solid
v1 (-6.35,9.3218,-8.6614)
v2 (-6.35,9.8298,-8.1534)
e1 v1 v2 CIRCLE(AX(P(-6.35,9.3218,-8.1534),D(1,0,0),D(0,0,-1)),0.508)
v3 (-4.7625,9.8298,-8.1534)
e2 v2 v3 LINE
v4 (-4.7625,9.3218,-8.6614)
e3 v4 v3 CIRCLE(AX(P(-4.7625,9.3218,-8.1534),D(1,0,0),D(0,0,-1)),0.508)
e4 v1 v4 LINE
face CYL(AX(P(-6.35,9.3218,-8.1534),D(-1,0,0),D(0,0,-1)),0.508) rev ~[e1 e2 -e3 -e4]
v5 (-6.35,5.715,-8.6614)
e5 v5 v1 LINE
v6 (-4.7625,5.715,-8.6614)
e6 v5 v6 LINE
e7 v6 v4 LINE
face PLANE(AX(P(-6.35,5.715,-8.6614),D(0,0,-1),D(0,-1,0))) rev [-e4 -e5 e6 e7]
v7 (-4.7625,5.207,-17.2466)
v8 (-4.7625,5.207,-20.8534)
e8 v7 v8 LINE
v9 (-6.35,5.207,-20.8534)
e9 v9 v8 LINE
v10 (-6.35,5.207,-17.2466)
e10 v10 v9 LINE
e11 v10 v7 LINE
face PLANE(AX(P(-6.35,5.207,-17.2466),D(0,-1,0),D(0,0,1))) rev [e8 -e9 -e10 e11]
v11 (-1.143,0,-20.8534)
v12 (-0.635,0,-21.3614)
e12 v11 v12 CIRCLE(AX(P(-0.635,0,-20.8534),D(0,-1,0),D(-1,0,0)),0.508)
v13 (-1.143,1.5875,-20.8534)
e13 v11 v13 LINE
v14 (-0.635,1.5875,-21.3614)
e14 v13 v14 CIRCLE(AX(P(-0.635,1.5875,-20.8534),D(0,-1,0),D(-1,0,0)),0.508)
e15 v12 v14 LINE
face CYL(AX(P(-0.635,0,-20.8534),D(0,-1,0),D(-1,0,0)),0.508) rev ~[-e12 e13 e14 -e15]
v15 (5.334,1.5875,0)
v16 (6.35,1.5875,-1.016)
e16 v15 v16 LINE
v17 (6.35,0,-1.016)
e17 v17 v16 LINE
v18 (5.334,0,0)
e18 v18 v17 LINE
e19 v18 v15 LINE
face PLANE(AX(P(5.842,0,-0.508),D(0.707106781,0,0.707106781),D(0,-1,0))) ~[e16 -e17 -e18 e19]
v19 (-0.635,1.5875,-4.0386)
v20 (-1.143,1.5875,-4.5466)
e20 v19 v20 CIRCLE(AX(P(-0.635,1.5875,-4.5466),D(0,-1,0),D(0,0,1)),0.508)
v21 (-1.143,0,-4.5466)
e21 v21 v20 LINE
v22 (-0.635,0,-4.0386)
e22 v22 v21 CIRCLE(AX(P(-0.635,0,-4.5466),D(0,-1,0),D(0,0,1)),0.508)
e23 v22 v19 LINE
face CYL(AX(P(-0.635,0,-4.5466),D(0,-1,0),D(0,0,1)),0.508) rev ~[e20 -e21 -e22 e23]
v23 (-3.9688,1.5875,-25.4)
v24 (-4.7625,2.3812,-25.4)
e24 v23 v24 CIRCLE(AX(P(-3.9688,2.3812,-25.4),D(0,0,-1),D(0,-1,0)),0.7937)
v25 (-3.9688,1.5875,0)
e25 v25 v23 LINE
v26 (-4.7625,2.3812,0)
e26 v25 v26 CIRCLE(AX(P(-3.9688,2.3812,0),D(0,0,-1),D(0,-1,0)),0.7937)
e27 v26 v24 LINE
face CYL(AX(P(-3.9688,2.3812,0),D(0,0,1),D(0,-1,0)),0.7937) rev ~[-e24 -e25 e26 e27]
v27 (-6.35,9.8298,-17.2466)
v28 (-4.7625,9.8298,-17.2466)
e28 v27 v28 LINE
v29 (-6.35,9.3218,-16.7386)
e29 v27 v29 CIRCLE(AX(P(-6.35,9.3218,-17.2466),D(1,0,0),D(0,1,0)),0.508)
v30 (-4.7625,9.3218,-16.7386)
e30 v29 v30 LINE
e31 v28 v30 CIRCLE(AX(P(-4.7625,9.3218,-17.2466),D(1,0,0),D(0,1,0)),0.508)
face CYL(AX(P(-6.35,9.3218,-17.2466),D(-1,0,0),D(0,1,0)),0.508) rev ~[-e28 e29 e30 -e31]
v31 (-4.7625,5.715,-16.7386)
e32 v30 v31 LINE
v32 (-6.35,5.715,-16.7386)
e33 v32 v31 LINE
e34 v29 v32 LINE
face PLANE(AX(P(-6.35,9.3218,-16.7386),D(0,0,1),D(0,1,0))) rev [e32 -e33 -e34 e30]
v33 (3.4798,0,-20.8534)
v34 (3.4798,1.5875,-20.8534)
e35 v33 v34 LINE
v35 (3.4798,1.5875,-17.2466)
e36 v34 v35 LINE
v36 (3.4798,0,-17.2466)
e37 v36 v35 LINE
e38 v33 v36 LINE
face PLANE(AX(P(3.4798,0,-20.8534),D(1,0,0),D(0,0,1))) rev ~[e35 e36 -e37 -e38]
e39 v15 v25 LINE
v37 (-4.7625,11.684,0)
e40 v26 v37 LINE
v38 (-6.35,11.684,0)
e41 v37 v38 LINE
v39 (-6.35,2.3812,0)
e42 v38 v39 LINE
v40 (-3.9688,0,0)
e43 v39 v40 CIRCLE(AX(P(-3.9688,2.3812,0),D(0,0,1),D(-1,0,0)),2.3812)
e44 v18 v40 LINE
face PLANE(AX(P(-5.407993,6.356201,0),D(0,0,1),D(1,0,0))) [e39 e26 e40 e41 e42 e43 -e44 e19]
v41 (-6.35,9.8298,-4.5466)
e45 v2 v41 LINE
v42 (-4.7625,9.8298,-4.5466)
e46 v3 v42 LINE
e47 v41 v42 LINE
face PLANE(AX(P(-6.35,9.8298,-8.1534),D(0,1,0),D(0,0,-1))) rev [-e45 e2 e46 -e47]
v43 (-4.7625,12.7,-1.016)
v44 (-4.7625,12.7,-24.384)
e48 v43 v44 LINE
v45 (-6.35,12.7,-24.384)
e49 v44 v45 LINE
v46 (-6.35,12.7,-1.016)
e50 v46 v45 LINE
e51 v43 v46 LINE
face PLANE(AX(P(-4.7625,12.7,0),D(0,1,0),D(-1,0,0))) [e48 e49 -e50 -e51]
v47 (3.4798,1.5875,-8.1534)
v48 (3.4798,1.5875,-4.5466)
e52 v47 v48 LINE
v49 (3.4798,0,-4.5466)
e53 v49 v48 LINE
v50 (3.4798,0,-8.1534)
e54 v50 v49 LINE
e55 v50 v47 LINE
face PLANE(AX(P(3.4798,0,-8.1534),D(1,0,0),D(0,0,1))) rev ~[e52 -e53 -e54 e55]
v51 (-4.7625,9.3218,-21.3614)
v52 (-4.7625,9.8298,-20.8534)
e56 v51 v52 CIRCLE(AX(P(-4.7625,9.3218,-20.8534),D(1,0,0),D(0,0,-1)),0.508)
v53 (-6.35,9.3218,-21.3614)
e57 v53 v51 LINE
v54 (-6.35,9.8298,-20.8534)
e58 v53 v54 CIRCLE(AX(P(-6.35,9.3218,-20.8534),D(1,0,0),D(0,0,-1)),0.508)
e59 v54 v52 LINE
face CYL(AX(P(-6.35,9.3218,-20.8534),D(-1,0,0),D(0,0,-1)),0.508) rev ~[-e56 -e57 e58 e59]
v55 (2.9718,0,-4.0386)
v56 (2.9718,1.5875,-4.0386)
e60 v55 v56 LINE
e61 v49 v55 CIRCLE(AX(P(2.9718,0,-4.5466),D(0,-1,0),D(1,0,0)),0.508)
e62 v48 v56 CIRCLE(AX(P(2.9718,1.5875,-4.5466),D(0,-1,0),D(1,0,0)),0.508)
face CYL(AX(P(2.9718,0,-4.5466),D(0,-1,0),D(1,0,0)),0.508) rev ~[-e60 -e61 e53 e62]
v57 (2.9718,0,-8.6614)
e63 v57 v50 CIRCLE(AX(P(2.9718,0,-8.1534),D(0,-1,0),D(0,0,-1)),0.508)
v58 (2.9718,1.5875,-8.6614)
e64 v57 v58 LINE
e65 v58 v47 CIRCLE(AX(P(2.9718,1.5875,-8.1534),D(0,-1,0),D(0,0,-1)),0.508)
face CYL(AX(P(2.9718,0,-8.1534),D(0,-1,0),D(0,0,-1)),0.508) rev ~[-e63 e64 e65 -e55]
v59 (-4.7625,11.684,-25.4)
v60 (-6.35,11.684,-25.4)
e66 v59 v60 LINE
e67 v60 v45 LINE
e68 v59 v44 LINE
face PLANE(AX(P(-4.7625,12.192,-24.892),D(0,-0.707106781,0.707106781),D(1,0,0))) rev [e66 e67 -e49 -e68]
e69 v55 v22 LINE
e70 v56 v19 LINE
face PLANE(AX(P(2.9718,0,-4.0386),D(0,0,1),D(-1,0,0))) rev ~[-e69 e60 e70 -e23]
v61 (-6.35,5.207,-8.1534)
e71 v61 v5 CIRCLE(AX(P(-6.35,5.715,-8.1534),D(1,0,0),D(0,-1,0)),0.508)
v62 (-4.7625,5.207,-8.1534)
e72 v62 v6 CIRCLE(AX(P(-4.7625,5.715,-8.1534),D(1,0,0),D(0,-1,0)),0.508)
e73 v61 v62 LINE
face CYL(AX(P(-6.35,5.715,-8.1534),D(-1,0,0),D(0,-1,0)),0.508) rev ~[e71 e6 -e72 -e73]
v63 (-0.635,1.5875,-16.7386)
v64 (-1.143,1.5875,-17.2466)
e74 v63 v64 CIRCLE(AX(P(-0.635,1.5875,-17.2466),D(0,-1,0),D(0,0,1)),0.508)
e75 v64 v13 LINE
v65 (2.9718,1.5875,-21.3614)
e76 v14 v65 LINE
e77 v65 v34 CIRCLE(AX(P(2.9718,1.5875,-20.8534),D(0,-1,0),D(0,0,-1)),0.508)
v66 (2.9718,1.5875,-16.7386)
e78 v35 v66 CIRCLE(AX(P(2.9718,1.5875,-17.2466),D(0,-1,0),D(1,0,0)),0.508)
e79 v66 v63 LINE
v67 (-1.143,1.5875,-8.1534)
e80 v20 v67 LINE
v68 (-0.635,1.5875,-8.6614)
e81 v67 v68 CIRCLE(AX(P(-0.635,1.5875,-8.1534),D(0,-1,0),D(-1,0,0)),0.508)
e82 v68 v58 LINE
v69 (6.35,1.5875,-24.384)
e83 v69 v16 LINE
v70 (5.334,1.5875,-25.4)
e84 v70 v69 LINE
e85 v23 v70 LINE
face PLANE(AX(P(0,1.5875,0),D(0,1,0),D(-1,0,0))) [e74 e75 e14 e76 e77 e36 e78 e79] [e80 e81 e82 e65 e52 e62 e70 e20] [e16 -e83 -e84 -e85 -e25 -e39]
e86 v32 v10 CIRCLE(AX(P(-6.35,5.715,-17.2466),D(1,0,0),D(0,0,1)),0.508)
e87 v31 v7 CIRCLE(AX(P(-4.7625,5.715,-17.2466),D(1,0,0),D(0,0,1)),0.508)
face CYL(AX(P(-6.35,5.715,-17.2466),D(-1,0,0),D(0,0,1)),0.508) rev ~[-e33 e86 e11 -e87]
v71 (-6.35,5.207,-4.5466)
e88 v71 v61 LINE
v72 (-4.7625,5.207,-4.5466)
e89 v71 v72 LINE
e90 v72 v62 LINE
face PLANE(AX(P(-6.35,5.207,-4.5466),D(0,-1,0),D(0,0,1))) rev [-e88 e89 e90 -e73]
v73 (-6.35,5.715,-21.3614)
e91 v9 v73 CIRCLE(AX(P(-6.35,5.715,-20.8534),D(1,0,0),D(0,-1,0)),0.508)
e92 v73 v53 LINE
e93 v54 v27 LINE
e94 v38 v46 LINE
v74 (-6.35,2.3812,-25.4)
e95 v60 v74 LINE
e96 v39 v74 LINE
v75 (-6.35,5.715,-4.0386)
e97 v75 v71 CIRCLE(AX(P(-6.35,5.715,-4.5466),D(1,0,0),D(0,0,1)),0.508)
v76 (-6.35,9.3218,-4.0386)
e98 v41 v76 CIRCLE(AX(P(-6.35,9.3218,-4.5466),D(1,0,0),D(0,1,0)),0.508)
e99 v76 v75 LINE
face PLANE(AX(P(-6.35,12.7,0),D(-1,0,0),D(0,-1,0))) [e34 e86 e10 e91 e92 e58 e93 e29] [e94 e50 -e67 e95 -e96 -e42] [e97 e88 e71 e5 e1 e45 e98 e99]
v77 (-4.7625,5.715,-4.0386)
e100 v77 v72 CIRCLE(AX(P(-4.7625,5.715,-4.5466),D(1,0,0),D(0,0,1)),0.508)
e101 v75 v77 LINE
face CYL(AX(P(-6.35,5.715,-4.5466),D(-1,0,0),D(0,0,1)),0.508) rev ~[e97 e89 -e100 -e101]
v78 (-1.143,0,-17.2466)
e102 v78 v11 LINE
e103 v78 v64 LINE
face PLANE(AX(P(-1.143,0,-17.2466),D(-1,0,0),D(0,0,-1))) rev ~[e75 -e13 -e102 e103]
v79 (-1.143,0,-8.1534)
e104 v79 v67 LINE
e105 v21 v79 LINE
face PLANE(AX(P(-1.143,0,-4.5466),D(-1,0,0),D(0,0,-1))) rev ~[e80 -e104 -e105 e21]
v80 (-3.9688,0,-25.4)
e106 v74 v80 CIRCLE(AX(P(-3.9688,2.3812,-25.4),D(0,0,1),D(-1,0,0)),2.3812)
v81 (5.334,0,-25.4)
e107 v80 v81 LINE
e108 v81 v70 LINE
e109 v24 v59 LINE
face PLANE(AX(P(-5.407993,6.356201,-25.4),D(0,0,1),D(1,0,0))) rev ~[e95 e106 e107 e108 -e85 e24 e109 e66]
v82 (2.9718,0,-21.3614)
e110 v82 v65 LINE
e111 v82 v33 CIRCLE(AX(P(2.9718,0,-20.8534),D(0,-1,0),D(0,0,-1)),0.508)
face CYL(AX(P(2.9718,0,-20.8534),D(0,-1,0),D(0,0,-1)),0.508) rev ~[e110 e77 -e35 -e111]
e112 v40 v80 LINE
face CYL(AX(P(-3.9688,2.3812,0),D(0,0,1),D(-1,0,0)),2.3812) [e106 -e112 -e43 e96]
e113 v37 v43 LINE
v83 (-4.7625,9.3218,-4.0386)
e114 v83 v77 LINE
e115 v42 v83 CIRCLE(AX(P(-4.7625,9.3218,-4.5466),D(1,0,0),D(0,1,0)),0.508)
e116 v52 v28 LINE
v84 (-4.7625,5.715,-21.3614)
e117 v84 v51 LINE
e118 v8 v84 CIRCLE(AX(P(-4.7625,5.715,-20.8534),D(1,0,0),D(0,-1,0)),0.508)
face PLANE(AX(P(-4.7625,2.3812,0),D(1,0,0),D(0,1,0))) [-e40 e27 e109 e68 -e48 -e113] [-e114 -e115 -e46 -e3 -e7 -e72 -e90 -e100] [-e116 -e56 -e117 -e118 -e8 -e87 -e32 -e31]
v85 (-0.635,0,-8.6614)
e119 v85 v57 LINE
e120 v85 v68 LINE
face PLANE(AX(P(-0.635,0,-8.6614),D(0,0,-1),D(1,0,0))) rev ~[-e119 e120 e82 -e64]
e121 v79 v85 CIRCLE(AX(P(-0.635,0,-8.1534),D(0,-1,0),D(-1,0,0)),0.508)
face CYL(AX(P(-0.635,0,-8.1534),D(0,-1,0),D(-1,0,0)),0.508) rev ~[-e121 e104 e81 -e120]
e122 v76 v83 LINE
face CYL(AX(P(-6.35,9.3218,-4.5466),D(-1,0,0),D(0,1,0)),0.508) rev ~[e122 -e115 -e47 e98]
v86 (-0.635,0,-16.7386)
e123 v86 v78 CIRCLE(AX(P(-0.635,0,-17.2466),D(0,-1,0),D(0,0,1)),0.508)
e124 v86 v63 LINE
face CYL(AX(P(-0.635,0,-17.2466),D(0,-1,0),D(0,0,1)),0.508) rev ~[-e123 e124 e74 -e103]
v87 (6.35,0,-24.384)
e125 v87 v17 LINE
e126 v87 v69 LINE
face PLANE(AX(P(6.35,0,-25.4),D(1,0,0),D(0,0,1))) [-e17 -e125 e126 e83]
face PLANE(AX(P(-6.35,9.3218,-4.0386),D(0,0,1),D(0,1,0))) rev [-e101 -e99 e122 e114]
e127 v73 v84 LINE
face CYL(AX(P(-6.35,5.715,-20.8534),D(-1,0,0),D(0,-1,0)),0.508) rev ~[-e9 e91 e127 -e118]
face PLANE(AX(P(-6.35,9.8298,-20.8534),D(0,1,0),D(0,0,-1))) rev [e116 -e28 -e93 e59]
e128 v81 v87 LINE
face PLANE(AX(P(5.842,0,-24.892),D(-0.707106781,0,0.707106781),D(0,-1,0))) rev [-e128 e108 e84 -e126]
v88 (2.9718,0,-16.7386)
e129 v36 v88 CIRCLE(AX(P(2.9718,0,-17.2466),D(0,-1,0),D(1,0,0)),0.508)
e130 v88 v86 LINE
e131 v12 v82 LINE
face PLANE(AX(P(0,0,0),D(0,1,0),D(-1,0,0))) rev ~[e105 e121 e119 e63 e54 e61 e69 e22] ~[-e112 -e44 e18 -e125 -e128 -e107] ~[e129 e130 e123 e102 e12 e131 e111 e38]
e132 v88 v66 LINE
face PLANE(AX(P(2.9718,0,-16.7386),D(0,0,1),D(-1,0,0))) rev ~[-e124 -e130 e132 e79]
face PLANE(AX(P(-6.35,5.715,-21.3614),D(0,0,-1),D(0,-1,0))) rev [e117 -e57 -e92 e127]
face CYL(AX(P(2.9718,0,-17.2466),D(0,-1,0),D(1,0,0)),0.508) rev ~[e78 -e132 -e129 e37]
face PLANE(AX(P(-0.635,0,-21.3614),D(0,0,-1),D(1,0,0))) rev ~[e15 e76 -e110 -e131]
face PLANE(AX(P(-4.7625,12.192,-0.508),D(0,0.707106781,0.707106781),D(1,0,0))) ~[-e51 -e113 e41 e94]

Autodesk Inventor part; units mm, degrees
ref_plane "YZ Plane" through (0, 0, 0) normal (1, 0, 0) x (0, 1, 0)
ref_plane "XZ Plane" through (0, 0, 0) normal (0, 1, 0) x (-1, 0, 0)
sketch "Sketch1" plane through (0, 0, 0) normal (0, 1, 0) x (-1, 0, 0)
  line L0 (-6.35, 0) -> (6.35, 0)
  line L1 (6.35, 0) -> (6.35, -25.4)
  line L2 (6.35, -25.4) -> (-6.35, -25.4)
  line L3 (-6.35, -25.4) -> (-6.35, 0)
  line L4 (6.35, 0) -> (-6.35, -25.4) construction
  point P0 (0, 0)
  point P1 (0, 0)
  dimension "d0" = 12.7
  dimension "d1" = 25.4
extrude "Plate1" add sketch "Sketch1" along normal blind 1.5875
sketch "Sketch2" plane through (-4.7625, 0, 0) normal (-1, 0, 0) x (0, -1, 0)
  line L0 (0, -25.4) -> (0, 0)
  line L1 (0, 0) -> (-12.7, 0)
  line L2 (-12.7, 0) -> (-12.7, -25.4)
  line L3 (-12.7, -25.4) -> (0, -25.4)
edge flange "Flanges" height 12.7 angle 90 thickness 1.5875 bend radius 0.7937 thickness toward (-1, 0, 0) relief tear relief width 1.5875 relief depth 0.7937 edges at (-6.35, 1.5875, -12.7) wall of the first edge with corners at (-4.7625, 0, -25.4) (-4.7625, 0, 0) (-4.7625, 12.7, 0) (-4.7625, 12.7, -25.4)
bend "Bend1"
corner "Corner1"
sketch "Sketch8" plane through (0, 0, 0) normal (0, -1, 0) x (1, 0, 0)
  line L0 (6.35, 0) -> (-3.9687, 0) construction
  line L1 (2.9718, -4.0386) -> (-0.635, -4.0386)
  line L2 (-1.143, -4.5466) -> (-1.143, -8.1534)
  line L3 (-0.635, -8.6614) -> (2.9718, -8.6614)
  line L4 (3.4798, -8.1534) -> (3.4798, -4.5466)
  arc A0 (3.4798, -4.5466) -> (2.9718, -4.0386) centre (2.9718, -4.5466) ccw
  arc A1 (2.9718, -8.6614) -> (3.4798, -8.1534) centre (2.9718, -8.1534) ccw
  arc A2 (-1.143, -8.1534) -> (-0.635, -8.6614) centre (-0.635, -8.1534) ccw
  arc A3 (-0.635, -4.0386) -> (-1.143, -4.5466) centre (-0.635, -4.5466) ccw
  line L5 (2.9718, -4.5466) -> (-0.635, -8.1534) construction
  line L6 (6.35, -25.4) -> (6.35, 0) construction
  point P0 (0, 0)
  point P1 (-1.143, -8.6614)
  point P2 (3.4798, -8.6614)
  point P3 (12.7, 0)
  point P4 (1.1684, -6.35)
  dimension "d49" = 4.6228
  dimension "d50" = 0.508
  dimension "d52" = 6.35
  dimension "d123" = 5.1816
extrude "Body Stamp" cut sketch "Sketch8" against normal blind 1.5875
sketch "Sketch9" plane through (0, 0, 0) normal (0, -1, 0) x (1, 0, 0)
  arc A0 (3.4798, -4.5466) -> (2.9718, -4.0386) centre (2.9718, -4.5466) ccw construction
  arc A1 (-1.143, -8.1534) -> (-0.635, -8.6614) centre (-0.635, -8.1534) ccw construction
  line L0 (2.9718, -4.5466) -> (-0.635, -8.1534) construction
  circle A2 centre (1.1684, -6.35) radius 2.1844
  point P0 (0, 0)
  dimension "d55" = 4.3688
surface extrude "Body Circle" sketch "Sketch9" against normal up to surface (1.5875 mm away) shown yes curves A2
sketch "Body Pattern Sketch" plane through (0, 0, 0) normal (0, -1, 0) x (1, 0, 0)
  line L0 (1.1684, -6.35) -> (1.1684, 0) construction
  circle A0 centre (1.1684, -6.35) radius 2.1844 construction
  point P0 (1.1684, -19.05)
  dimension "d133" = 12.7
pattern_sketch "Body Pattern" of "Body Stamp", "Body Circle" from (1.1684, 0, -6.35) copies at (1.1684, 0, -19.05)
sketch "Arc Length" plane through (19.05, 2.3812, 0) normal (0, 0, 1) x (1, 0, 0)
  line L0 (-25.4, 0) -> (-23.8125, 0) projected
  arc A0 (-25.4, 0) -> (-23.0187, -2.3813) centre (-23.0187, 0) ccw projected
  line L1 (-23.0187, -0.7938) -> (-23.0187, -2.3813) projected
  arc A1 (-23.8125, 0) -> (-23.0187, -0.7938) centre (-23.0187, 0) ccw projected
  point P0 (-19.05, -2.3812)
  dimension "d126" = 1.2468
  dimension "d127" = 3.7405
sketch "Sketch13" plane through (-6.35, 0, 419.1) normal (1, 0, 0) x (0, 0, -1)
  line L0 (480.568, 12.7) -> (482.6, 10.668)
  line L1 (482.6, 10.668) -> (484.632, 12.7)
  line L2 (480.568, 12.7) -> (484.632, 12.7)
  line L3 (482.6, 3.3973) -> (480.3372, 1.1344)
  line L4 (480.3372, 1.1344) -> (482.6, -1.1284)
  line L5 (482.6, -1.1284) -> (484.8628, 1.1344)
  line L6 (484.8628, 1.1344) -> (482.6, 3.3973)
  line L7 (482.6, 3.3973) -> (482.6, -1.1284) construction
  line L8 (482.6, 10.668) -> (482.6, 3.3973) construction
  line L9 (444.5, 12.7) -> (419.1, 12.7) projected
  line L10 (444.5, 2.3813) -> (419.1, 2.3813) construction
  line L11 (419.1, 12.7) -> (419.1, 2.3813) construction
  point P0 (444.5, -11.9062)
  point P1 (419.1, 0)
  dimension "d86" = 4.5256
  dimension "d128" = 2.032
  dimension "d129" = 1.016
  dimension "d130" = 63.5
feature "Notch" [suppressed]
pattern_linear "Notch Pattern" [suppressed]
ref_plane "Diagonal Plane" through (-4.7625, 1.5875, 0) normal (-0.7071068, 0.7071068, 0) x (0, 0, 1)
mirror "Everything Mirrored" about plane through (-4.7625, 1.5875, 0) normal (-0.7071068, 0.7071068, 0) of "Body Stamp", "Body Circle", "Body Pattern"
chamfer "End Chamfer" distance 1.016 angle 45 4 edges at (-5.5562, 12.7, -25.4) (-5.5562, 12.7, 0) (6.35, 0.7937, 0) (6.35, 0.7937, -25.4)
equation "\"d1\" = 12.7 * Length"
equation "\"d53\" = Thickness"
equation "\"d89\" = Thickness"
equation "\"d2\" = Thickness"
equation "\"d3\" = BendReliefWidth"
equation "\"d4\" = BendReliefDepth"
equation "\"d5\" = MinimumRemnant"
equation "\"d6\" = TransitionRadius"
equation "\"d10\" = CornerReliefSize"
equation "\"d11\" = GapSize"
equation "\"d12\" = JacobiRadiusSize"
equation "\"BendRadius\" = Thickness"
equation "\"BendReliefWidth\" = Thickness"
equation "\"BendReliefDepth\" = 0.5 * Thickness"
equation "\"CornerReliefSize\" = 4 * Thickness"
equation "\"MinimumRemnant\" = 2 * Thickness"
equation "\"TransitionRadius\" = BendRadius"
equation "\"JacobiRadiusSize\" = BendRadius"
equation "\"GapSize\" = Thickness"
equation "\"Length\" = 2"
equation "\"Thickness\" = 1.5875"
properties part number "Alu C 1x2x1x35"
